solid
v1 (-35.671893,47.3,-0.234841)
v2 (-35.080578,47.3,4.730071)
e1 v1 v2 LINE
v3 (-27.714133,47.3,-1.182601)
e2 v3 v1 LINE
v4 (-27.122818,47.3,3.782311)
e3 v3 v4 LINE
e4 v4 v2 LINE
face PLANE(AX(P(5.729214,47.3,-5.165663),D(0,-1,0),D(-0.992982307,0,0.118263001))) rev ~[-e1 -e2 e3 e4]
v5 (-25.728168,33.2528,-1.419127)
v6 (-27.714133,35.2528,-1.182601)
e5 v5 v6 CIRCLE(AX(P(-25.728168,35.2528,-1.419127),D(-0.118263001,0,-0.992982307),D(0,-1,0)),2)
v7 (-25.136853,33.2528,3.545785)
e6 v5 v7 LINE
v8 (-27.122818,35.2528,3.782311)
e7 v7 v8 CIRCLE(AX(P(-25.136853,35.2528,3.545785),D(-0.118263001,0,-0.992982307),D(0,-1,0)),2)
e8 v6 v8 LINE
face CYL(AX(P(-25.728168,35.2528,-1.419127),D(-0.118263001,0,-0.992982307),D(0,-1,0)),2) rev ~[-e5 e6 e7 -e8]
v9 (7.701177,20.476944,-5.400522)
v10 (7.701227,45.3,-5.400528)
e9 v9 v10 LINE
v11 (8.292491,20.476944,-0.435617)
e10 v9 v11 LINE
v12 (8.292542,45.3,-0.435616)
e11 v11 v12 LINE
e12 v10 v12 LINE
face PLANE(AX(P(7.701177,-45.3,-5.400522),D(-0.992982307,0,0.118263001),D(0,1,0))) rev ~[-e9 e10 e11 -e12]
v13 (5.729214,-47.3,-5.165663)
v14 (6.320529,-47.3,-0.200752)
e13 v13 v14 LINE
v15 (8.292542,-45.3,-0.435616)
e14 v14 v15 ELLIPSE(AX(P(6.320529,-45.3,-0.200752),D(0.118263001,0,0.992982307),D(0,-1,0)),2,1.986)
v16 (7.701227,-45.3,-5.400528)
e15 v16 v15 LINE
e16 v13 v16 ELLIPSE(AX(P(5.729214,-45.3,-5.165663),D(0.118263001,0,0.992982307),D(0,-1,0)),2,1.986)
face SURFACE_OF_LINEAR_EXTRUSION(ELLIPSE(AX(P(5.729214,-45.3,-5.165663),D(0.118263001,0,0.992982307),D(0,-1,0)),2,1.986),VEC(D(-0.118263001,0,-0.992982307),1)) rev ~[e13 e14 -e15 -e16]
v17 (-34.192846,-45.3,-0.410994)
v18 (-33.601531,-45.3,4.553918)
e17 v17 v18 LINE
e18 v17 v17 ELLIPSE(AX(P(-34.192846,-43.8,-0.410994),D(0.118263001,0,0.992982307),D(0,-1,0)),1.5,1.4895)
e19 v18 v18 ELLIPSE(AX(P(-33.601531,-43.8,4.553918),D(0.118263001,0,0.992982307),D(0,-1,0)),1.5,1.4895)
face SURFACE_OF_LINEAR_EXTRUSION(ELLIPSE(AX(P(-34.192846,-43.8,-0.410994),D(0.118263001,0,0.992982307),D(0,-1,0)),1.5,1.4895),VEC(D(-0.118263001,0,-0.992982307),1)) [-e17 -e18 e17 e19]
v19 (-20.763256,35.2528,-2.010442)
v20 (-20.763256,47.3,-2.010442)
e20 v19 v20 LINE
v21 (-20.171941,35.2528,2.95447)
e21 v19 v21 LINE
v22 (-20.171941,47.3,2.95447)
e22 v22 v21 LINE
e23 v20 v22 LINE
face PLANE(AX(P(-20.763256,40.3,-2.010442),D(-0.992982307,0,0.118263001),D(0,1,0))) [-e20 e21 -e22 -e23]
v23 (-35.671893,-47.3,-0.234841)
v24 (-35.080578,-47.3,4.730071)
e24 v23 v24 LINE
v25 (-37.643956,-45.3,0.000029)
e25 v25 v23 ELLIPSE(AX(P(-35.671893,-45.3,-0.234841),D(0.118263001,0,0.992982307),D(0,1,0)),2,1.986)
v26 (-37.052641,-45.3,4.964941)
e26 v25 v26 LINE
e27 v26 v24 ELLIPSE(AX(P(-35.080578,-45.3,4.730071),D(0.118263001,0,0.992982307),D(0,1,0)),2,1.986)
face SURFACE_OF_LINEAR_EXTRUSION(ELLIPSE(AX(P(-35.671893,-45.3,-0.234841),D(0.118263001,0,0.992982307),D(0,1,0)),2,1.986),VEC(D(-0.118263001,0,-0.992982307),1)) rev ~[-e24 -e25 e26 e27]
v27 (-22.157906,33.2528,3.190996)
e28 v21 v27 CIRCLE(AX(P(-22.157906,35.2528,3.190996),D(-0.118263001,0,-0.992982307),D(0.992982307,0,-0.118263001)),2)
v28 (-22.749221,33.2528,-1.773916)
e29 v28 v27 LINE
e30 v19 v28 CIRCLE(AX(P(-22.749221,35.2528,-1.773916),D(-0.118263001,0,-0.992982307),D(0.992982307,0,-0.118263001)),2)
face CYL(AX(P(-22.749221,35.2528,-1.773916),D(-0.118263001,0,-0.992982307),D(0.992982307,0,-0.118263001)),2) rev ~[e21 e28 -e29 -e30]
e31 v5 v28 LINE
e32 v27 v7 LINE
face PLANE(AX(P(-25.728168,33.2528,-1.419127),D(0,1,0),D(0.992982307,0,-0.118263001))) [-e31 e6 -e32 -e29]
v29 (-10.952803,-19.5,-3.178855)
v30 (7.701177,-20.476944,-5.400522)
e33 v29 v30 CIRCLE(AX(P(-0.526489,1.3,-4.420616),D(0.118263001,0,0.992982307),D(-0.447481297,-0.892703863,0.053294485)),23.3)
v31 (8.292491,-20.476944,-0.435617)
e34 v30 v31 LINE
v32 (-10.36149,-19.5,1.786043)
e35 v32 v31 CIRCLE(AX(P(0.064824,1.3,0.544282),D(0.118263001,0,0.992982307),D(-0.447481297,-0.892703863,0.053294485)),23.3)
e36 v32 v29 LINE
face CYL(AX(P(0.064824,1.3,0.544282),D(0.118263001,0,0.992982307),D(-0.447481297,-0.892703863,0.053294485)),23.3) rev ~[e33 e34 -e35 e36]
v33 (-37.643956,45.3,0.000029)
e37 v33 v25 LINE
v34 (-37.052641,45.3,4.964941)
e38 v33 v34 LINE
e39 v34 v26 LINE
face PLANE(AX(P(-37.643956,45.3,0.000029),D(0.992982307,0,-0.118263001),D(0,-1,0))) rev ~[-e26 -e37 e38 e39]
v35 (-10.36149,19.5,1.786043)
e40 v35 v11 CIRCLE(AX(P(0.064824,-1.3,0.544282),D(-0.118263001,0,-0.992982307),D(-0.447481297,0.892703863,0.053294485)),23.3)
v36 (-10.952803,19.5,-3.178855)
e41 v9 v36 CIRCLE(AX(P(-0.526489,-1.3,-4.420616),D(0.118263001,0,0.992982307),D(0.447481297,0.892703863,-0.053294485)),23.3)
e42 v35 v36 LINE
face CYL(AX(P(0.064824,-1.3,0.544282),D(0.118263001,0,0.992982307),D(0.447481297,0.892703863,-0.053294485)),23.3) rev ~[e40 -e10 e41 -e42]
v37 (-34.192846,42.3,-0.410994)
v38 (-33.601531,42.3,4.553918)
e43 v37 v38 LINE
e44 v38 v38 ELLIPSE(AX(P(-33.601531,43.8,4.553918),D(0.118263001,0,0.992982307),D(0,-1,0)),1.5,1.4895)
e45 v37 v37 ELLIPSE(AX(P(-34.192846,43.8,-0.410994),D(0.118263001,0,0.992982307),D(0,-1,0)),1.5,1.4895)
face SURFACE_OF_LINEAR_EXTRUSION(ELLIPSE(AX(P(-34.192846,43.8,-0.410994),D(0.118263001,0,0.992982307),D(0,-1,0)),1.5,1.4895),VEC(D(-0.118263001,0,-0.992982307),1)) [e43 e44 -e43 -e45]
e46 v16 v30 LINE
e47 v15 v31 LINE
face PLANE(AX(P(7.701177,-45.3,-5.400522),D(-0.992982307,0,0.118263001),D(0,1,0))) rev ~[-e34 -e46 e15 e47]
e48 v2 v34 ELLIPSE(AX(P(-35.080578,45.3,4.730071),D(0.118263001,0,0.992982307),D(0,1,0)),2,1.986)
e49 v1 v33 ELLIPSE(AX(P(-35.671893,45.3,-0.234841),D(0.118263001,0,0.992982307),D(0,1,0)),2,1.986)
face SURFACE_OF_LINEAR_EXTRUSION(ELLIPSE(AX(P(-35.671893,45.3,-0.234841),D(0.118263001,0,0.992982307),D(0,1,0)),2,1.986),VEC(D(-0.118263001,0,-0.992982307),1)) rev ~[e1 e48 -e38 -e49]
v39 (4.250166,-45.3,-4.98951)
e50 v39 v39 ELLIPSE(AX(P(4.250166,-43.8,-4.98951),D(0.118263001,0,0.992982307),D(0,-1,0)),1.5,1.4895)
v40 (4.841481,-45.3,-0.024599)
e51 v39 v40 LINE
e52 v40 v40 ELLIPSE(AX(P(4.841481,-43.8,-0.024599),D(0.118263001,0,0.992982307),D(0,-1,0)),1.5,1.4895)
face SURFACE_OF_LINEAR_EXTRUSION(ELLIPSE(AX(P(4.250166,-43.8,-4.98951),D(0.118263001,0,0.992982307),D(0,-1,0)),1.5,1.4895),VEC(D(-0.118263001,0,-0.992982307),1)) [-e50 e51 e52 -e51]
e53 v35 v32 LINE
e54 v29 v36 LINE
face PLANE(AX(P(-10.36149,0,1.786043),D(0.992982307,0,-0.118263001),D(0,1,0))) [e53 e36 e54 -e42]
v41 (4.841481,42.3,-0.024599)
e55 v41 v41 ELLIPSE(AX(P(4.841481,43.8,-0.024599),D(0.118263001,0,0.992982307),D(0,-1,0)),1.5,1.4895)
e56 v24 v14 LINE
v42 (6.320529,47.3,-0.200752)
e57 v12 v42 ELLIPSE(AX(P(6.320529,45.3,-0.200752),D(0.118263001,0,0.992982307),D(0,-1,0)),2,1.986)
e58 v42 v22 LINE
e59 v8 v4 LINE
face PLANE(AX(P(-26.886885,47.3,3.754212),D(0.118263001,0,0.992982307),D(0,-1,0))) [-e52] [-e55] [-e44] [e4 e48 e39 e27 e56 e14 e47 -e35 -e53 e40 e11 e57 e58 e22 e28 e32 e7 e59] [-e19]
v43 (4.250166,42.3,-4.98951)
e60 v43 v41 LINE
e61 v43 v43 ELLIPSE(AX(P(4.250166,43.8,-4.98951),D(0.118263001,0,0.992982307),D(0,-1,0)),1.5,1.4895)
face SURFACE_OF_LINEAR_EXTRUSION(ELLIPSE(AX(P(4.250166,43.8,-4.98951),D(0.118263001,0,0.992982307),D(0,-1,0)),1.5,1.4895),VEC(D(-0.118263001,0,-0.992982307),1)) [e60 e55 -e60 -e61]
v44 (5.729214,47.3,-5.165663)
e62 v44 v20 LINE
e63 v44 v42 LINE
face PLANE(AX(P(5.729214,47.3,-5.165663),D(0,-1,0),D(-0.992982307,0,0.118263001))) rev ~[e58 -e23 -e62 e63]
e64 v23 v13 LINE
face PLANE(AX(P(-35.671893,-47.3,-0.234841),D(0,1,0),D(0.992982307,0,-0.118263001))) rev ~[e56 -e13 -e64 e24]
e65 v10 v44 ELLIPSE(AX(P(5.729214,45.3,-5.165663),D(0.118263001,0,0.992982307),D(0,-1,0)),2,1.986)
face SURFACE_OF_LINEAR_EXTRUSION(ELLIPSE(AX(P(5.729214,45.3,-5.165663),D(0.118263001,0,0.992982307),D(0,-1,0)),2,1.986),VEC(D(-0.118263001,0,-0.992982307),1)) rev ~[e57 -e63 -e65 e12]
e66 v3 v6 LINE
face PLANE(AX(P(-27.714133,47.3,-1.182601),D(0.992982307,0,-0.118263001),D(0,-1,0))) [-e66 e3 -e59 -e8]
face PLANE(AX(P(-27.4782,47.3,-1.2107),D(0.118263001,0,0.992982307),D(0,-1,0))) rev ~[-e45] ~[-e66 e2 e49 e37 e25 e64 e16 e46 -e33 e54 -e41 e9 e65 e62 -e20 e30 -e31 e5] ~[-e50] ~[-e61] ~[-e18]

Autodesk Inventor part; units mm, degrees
ref_plane "YZ Plane" through (0, 0, 0) normal (1, 0, 0) x (0, 1, 0)
ref_plane "XZ Plane" through (0, 0, 0) normal (0, 1, 0) x (-1, 0, 0)
ref_plane "XY Plane" through (0, 0, 0) normal (0, 0, 1) x (1, 0, 0)
ref_plane "Work Plane1" through (-27.4782, 47.3, -1.2107) normal (0.118263, 0, 0.9929823) x (0, -1, 0)
sketch "Sketch1" plane through (-27.4782, 47.3, -1.2107) normal (0.118263, 0, 0.9929823) x (0, -1, 0)
  line L0 (0, 33.4421) -> (0, -8.2516) projected
  line L1 (2, -10.2376) -> (92.6, -10.2376) projected
  line L2 (94.6, -8.2516) -> (94.6, 33.4421) projected
  line L3 (92.6, 35.428) -> (2, 35.428) projected
  line L4 (7, -3.2867) -> (7, 28.4771) projected
  line L5 (7, 28.4771) -> (87.6, 28.4771) projected
  line L6 (87.6, 28.4771) -> (87.6, -3.2867) projected
  line L7 (87.6, -3.2867) -> (7, -3.2867) projected
  ellipse E0 centre (2, 33.4421) end of major axis (4, 33.4421) minor radius 1.986 (2, 35.428) -> (0, 33.4421) ccw projected
  ellipse E1 centre (2, -8.2516) end of major axis (0, -8.2516) minor radius 1.986 (0, -8.2516) -> (2, -10.2376) ccw projected
  ellipse E2 centre (92.6, -8.2516) end of major axis (90.6, -8.2516) minor radius 1.986 (92.6, -10.2376) -> (94.6, -8.2516) ccw projected
  ellipse E3 centre (92.6, 33.4421) end of major axis (94.6, 33.4421) minor radius 1.986 (94.6, 33.4421) -> (92.6, 35.428) ccw projected
  ellipse E4 centre (91.1, -6.7621) end of major axis (92.6, -6.7621) minor radius 1.4895 projected
  ellipse E5 centre (3.5, -6.7621) end of major axis (5, -6.7621) minor radius 1.4895 projected
  ellipse E6 centre (91.1, 31.9526) end of major axis (92.6, 31.9526) minor radius 1.4895 projected
  ellipse E7 centre (3.5, 31.9526) end of major axis (5, 31.9526) minor radius 1.4895 projected
  point P0 (47.3, 27.1422)
extrude "Extrusion1" add sketch "Sketch1" along normal blind 5 contours E0 L3 E3 L2 E2 L1 E1 L0 | L4 L5 L6 L7
sketch "Sketch2" plane through (-26.8869, 47.3, 3.7542) normal (0.118263, 0, 0.9929823) x (0.9929823, 0, -0.118263)
  line L0 (16.6422, -25.3) -> (37.6422, -25.3)
  line L1 (37.6422, -25.3) -> (37.6422, -69.3)
  line L2 (37.6422, -69.3) -> (16.6422, -69.3)
  line L3 (16.6422, -69.3) -> (16.6422, -25.3)
  line L4 (16.6422, -25.3) -> (37.6422, -69.3) construction
  line L5 (37.6422, -25.3) -> (16.6422, -69.3) construction
  line L6 (37.6422, -27.8) -> (16.6422, -27.8)
  arc A0 (37.6422, -27.8) -> (16.6422, -27.8) centre (27.1422, -48.6) ccw
  line L7 (33.4421, 0) -> (-8.2516, 0) projected
  arc A1 (-8.2516, 0) -> (-10.2376, -2) centre (2, -2) ccw projected
  line L8 (-10.2376, -2) -> (-10.2376, -92.6) projected
  arc A2 (-10.2376, -92.6) -> (-8.2516, -94.6) centre (2, -92.6) ccw projected
  line L9 (-8.2516, -94.6) -> (33.4421, -94.6) projected
  arc A3 (33.4421, -94.6) -> (35.428, -92.6) centre (45.9099, -92.6) ccw projected
  line L10 (35.428, -92.6) -> (35.428, -2) projected
  arc A4 (35.428, -2) -> (33.4421, 0) centre (45.9099, -2) ccw projected
  circle A5 centre (44.4099, -3.5) radius 1.5 projected
  circle A6 centre (44.4099, -91.1) radius 1.5 projected
  circle A7 centre (3.5, -3.5) radius 1.5 projected
  circle A8 centre (3.5, -91.1) radius 1.5 projected
  line L11 (35.428, -47.3) -> (-10.2376, -47.3)
  line L12 (-10.2376, -2) -> (-10.2376, -92.6) projected
  arc A9 (16.6422, -66.8) -> (37.6422, -66.8) centre (27.1422, -46) ccw
  point P0 (27.1422, -47.3)
  point P1 (27.1422, -25.3)
  point P2 (16.6422, -66.8)
  point P3 (37.6422, -66.8)
  dimension "d2" = 21
  dimension "d3" = 44
  dimension "d4" = 2.5
extrude "Extrusion2" cut sketch "Sketch2" against normal through all contours A0 L10 L6 | L6 L10 L11 L3 | A0 L6 L10 | L11 L10 A9 L3 | L6 L1 A9 L10
sketch "Sketch3" plane through (-27.4782, 47.3, -1.2107) normal (-0.118263, 0, -0.9929823) x (-0.9929823, 0, 0.118263)
  arc A0 (-35.428, -67.7769) -> (-16.6422, -66.8) centre (-27.1422, -46) ccw projected
  arc A1 (-16.6422, -27.8) -> (-35.428, -26.8231) centre (-27.1422, -48.6) ccw projected
  line L0 (-16.6422, -27.8) -> (-16.6422, -66.8) projected
  line L1 (-33.4421, 0) -> (8.2516, 0) projected
  arc A2 (-33.4421, 0) -> (-35.428, -2) centre (-45.9099, -2) ccw projected
  line L2 (-35.428, -92.6) -> (-35.428, -67.7769) projected
  arc A3 (-35.428, -92.6) -> (-33.4421, -94.6) centre (-45.9099, -92.6) ccw projected
  line L3 (8.2516, -94.6) -> (-33.4421, -94.6) projected
  arc A4 (8.2516, -94.6) -> (10.2376, -92.6) centre (-2, -92.6) ccw projected
  line L4 (10.2376, -2) -> (10.2376, -92.6) projected
  arc A5 (10.2376, -2) -> (8.2516, 0) centre (-2, -2) ccw projected
  circle A6 centre (-44.4099, -3.5) radius 1.5 projected
  circle A7 centre (-44.4099, -91.1) radius 1.5 projected
  circle A8 centre (-3.5, -3.5) radius 1.5 projected
  circle A9 centre (-3.5, -91.1) radius 1.5 projected
  line L5 (-6.7624, 0) -> (0.2376, 0)
  line L6 (0.2376, 0) -> (0.2376, -12.0472)
  line L7 (-1.7624, -14.0472) -> (-4.7624, -14.0472)
  line L8 (-6.7624, -12.0472) -> (-6.7624, 0)
  arc A10 (-6.7624, -12.0472) -> (-4.7624, -14.0472) centre (-4.7624, -12.0472) ccw
  arc A11 (-1.7624, -14.0472) -> (0.2376, -12.0472) centre (-1.7624, -12.0472) ccw
  line L9 (0.2376, -7) -> (-6.7624, -7)
  line L10 (-35.428, -26.8231) -> (-35.428, -2) projected
  point P0 (-27.1422, -47.3)
  point P1 (0.2376, -14.0472)
  point P2 (-6.7624, -14.0472)
  point P3 (0.2376, 0)
  dimension "d7" = 7
  dimension "d9" = 2
  dimension "d12" = 10
  dimension "d13" = 7
extrude "Extrusion3" cut sketch "Sketch3" against normal through all contours L1 L6 L9 L8 | L9 L6 A11 L7 A10 L8 | A8
properties part number "TAPA_CAMARA_2"
